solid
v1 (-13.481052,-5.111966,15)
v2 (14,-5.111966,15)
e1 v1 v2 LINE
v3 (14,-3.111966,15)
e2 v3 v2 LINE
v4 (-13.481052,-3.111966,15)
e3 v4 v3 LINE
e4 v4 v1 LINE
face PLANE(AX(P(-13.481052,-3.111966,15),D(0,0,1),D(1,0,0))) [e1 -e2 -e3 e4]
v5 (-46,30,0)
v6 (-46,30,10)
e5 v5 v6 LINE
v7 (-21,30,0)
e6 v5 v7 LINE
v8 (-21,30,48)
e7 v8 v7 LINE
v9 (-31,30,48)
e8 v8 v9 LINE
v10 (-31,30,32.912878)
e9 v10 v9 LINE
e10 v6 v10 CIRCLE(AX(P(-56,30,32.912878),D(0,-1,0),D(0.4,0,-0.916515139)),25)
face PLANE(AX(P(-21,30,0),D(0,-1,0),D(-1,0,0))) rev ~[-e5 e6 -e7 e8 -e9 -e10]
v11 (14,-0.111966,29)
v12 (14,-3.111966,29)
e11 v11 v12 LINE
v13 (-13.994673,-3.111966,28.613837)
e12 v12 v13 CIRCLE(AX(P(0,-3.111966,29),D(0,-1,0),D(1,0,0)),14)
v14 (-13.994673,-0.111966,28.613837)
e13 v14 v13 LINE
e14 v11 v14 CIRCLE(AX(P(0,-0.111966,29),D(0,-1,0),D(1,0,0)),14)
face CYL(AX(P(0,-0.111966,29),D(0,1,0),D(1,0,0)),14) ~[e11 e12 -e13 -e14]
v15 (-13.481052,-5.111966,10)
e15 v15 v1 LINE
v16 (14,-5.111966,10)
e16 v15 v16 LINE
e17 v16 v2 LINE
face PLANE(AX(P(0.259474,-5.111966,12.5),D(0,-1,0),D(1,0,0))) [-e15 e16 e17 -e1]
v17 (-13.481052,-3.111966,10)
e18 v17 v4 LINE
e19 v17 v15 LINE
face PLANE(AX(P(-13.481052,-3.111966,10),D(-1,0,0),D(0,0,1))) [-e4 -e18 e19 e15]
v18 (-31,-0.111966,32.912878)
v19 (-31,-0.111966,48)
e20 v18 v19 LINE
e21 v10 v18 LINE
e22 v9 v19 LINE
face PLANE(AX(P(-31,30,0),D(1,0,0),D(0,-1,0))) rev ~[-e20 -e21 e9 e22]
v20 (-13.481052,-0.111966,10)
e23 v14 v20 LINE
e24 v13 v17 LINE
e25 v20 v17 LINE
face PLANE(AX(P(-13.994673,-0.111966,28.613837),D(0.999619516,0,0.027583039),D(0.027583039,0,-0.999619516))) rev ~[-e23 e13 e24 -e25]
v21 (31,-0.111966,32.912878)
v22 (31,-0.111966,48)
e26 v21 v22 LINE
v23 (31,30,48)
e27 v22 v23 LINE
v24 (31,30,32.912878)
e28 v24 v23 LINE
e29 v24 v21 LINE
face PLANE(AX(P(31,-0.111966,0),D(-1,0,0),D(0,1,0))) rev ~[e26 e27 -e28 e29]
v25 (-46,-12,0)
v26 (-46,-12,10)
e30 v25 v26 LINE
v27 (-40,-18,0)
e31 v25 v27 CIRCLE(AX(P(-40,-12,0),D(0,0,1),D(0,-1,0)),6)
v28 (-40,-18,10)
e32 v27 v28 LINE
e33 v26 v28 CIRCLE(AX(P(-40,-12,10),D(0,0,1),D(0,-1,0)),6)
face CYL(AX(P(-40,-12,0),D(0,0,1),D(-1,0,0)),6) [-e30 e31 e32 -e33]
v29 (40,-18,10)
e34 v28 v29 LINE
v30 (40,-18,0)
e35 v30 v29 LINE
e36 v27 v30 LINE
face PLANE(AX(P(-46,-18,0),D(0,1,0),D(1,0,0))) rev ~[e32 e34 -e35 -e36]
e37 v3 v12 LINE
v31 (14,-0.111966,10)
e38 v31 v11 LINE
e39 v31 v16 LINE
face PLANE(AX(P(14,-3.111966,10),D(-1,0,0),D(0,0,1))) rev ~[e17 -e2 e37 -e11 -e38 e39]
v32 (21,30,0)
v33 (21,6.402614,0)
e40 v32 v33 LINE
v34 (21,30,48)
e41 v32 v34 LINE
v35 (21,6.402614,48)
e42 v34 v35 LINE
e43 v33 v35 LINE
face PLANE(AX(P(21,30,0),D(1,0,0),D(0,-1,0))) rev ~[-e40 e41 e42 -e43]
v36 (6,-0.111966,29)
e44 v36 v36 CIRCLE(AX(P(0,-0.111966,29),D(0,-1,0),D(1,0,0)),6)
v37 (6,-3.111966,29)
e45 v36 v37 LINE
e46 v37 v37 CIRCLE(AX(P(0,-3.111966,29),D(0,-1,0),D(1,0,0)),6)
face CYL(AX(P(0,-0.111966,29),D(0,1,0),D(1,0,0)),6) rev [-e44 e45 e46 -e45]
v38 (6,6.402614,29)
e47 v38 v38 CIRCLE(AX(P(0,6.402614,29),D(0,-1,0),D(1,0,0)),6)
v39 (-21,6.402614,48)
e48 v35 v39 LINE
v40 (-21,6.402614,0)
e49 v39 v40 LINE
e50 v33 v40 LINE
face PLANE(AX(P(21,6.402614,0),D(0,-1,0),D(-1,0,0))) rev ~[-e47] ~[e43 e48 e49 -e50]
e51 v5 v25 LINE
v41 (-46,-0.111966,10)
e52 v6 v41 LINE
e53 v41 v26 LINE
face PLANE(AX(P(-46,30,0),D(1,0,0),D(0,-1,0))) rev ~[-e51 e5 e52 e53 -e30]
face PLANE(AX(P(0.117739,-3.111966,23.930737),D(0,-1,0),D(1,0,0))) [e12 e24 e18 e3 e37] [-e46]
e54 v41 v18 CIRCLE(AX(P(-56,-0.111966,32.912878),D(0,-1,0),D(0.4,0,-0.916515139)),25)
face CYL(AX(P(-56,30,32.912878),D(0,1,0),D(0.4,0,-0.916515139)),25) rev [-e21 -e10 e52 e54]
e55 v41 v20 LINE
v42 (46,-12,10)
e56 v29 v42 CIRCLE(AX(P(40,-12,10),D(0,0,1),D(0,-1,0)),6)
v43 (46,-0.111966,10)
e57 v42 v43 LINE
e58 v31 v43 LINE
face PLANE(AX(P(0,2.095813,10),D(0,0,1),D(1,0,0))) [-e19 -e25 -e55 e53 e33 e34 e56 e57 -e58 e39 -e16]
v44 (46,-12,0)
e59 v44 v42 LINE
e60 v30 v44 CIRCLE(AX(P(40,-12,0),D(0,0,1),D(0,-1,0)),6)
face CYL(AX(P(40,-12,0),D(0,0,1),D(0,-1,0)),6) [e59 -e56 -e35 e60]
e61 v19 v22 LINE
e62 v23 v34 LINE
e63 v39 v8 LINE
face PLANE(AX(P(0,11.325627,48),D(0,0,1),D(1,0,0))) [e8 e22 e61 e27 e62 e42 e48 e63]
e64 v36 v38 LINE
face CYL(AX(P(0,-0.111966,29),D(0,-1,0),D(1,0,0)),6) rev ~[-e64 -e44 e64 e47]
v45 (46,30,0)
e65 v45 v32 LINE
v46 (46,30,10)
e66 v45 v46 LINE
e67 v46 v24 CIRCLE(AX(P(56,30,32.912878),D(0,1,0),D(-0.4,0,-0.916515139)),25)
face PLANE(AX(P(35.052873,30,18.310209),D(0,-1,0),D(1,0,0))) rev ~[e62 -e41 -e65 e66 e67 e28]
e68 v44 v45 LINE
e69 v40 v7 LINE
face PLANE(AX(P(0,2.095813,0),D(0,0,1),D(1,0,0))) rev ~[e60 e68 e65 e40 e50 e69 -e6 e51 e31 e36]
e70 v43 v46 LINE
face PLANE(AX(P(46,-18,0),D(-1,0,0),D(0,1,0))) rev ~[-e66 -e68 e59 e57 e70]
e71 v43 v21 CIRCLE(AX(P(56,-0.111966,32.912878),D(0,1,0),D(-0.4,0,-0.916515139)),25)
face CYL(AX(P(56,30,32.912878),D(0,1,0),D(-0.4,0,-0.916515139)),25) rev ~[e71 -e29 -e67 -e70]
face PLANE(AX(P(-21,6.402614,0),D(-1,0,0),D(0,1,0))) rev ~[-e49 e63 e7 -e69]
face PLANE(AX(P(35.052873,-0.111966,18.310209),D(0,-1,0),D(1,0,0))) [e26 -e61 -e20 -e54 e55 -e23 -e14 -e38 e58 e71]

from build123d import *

# Parameters (mm, degrees)
F2_DEPTH    = 10
F3_DEPTH    = 48
F4_R        = 6
F5_DEPTH    = 3
F6_W        = 27.4810515978
F6_H        = 5
F7_DEPTH    = 2
F8_DEPTH    = 20
F9_T1_DEPTH = 30.1119658546
F10_R       = 6


# Not quite as in the source:
# - a fillet or chamfer that OpenCascade refuses, or shapes differently, is made with other operations: its cross-section is extruded or revolved along the edge and cut away or added


with BuildPart() as f2:
    # F0 (on Top) → F2 (new body)
    with BuildSketch(Plane.XY):
        Polygon((46, -18), (46, 30), (31, 30), (31, -0.1119658546), (-31, -0.1119658546), (-31, 30), (-46, 30), (-46, -18), align=None)
        Polygon((31, -0.1119658546), (31, 30), (21, 30), (21, 6.4026141707), (-21, 6.4026141707), (-21, 30), (-31, 30), (-31, -0.1119658546), align=None)
    extrude(amount=F2_DEPTH)

    # F1 (on Top) → F3 (join)
    with BuildSketch(Plane.XY):
        Polygon((31, -0.1119658546), (31, 30), (21, 30), (21, 6.4026141707), (-21, 6.4026141707), (-21, 30), (-31, 30), (-31, -0.1119658546), align=None)
    extrude(amount=F3_DEPTH)

    # F4 (on face) → F5 (join)
    with BuildSketch(Plane.XZ.offset(0.1119658546)):
        with BuildLine():
            Line((14, 10), (14, 29))
            ThreePointArc((14, 29), (-0.1930996384, 42.9986682413), (-13.9946732185, 28.6138374607))
            Line((-13.9946732185, 28.6138374607), (-13.4810515978, 10))
            Line((-13.4810515978, 10), (14, 10))
        make_face()
        with Locations((0, 29)):
            Circle(F4_R, mode=Mode.SUBTRACT)
    extrude(amount=F5_DEPTH)

    # F6 (on face) → F7 (join)
    with BuildSketch(Plane.XZ.offset(3.1119658546)):
        with Locations((0.2594742011, 12.5)):
            Rectangle(F6_W, F6_H)
    extrude(amount=F7_DEPTH)

    # F8 (cut): a face of the model
    f8_faces = [f2.faces().sort_by_distance(p)[0] for p in [
        (0, -0.1119658546, 29),
    ]]
    extrude(f8_faces, amount=-F8_DEPTH, mode=Mode.SUBTRACT)

    # F9: fillet of radius 25 on 2 edges, made by hand

    # F9_s2 → F9_t1 (join)
    with BuildSketch(Plane.XZ.offset(-30)):
        with BuildLine():
            ThreePointArc((46, 10), (35.0834993366, 19.2198145372), (31, 32.9128784748))
            Line((31, 32.9128784748), (31, 10))
            Line((31, 10), (46, 10))
        make_face()
        with BuildLine():
            ThreePointArc((-46, 10), (-35.0834993366, 19.2198145372), (-31, 32.9128784748))
            Line((-31, 32.9128784748), (-31, 10))
            Line((-31, 10), (-46, 10))
        make_face()
    extrude(amount=F9_T1_DEPTH)

    # F10
    f10_edges = [f2.edges().sort_by_distance(p)[0] for p in [
        (-46, -18, 5),
        (46, -18, 5),
    ]]
    fillet(f10_edges, radius=F10_R)


solid = f2.part
